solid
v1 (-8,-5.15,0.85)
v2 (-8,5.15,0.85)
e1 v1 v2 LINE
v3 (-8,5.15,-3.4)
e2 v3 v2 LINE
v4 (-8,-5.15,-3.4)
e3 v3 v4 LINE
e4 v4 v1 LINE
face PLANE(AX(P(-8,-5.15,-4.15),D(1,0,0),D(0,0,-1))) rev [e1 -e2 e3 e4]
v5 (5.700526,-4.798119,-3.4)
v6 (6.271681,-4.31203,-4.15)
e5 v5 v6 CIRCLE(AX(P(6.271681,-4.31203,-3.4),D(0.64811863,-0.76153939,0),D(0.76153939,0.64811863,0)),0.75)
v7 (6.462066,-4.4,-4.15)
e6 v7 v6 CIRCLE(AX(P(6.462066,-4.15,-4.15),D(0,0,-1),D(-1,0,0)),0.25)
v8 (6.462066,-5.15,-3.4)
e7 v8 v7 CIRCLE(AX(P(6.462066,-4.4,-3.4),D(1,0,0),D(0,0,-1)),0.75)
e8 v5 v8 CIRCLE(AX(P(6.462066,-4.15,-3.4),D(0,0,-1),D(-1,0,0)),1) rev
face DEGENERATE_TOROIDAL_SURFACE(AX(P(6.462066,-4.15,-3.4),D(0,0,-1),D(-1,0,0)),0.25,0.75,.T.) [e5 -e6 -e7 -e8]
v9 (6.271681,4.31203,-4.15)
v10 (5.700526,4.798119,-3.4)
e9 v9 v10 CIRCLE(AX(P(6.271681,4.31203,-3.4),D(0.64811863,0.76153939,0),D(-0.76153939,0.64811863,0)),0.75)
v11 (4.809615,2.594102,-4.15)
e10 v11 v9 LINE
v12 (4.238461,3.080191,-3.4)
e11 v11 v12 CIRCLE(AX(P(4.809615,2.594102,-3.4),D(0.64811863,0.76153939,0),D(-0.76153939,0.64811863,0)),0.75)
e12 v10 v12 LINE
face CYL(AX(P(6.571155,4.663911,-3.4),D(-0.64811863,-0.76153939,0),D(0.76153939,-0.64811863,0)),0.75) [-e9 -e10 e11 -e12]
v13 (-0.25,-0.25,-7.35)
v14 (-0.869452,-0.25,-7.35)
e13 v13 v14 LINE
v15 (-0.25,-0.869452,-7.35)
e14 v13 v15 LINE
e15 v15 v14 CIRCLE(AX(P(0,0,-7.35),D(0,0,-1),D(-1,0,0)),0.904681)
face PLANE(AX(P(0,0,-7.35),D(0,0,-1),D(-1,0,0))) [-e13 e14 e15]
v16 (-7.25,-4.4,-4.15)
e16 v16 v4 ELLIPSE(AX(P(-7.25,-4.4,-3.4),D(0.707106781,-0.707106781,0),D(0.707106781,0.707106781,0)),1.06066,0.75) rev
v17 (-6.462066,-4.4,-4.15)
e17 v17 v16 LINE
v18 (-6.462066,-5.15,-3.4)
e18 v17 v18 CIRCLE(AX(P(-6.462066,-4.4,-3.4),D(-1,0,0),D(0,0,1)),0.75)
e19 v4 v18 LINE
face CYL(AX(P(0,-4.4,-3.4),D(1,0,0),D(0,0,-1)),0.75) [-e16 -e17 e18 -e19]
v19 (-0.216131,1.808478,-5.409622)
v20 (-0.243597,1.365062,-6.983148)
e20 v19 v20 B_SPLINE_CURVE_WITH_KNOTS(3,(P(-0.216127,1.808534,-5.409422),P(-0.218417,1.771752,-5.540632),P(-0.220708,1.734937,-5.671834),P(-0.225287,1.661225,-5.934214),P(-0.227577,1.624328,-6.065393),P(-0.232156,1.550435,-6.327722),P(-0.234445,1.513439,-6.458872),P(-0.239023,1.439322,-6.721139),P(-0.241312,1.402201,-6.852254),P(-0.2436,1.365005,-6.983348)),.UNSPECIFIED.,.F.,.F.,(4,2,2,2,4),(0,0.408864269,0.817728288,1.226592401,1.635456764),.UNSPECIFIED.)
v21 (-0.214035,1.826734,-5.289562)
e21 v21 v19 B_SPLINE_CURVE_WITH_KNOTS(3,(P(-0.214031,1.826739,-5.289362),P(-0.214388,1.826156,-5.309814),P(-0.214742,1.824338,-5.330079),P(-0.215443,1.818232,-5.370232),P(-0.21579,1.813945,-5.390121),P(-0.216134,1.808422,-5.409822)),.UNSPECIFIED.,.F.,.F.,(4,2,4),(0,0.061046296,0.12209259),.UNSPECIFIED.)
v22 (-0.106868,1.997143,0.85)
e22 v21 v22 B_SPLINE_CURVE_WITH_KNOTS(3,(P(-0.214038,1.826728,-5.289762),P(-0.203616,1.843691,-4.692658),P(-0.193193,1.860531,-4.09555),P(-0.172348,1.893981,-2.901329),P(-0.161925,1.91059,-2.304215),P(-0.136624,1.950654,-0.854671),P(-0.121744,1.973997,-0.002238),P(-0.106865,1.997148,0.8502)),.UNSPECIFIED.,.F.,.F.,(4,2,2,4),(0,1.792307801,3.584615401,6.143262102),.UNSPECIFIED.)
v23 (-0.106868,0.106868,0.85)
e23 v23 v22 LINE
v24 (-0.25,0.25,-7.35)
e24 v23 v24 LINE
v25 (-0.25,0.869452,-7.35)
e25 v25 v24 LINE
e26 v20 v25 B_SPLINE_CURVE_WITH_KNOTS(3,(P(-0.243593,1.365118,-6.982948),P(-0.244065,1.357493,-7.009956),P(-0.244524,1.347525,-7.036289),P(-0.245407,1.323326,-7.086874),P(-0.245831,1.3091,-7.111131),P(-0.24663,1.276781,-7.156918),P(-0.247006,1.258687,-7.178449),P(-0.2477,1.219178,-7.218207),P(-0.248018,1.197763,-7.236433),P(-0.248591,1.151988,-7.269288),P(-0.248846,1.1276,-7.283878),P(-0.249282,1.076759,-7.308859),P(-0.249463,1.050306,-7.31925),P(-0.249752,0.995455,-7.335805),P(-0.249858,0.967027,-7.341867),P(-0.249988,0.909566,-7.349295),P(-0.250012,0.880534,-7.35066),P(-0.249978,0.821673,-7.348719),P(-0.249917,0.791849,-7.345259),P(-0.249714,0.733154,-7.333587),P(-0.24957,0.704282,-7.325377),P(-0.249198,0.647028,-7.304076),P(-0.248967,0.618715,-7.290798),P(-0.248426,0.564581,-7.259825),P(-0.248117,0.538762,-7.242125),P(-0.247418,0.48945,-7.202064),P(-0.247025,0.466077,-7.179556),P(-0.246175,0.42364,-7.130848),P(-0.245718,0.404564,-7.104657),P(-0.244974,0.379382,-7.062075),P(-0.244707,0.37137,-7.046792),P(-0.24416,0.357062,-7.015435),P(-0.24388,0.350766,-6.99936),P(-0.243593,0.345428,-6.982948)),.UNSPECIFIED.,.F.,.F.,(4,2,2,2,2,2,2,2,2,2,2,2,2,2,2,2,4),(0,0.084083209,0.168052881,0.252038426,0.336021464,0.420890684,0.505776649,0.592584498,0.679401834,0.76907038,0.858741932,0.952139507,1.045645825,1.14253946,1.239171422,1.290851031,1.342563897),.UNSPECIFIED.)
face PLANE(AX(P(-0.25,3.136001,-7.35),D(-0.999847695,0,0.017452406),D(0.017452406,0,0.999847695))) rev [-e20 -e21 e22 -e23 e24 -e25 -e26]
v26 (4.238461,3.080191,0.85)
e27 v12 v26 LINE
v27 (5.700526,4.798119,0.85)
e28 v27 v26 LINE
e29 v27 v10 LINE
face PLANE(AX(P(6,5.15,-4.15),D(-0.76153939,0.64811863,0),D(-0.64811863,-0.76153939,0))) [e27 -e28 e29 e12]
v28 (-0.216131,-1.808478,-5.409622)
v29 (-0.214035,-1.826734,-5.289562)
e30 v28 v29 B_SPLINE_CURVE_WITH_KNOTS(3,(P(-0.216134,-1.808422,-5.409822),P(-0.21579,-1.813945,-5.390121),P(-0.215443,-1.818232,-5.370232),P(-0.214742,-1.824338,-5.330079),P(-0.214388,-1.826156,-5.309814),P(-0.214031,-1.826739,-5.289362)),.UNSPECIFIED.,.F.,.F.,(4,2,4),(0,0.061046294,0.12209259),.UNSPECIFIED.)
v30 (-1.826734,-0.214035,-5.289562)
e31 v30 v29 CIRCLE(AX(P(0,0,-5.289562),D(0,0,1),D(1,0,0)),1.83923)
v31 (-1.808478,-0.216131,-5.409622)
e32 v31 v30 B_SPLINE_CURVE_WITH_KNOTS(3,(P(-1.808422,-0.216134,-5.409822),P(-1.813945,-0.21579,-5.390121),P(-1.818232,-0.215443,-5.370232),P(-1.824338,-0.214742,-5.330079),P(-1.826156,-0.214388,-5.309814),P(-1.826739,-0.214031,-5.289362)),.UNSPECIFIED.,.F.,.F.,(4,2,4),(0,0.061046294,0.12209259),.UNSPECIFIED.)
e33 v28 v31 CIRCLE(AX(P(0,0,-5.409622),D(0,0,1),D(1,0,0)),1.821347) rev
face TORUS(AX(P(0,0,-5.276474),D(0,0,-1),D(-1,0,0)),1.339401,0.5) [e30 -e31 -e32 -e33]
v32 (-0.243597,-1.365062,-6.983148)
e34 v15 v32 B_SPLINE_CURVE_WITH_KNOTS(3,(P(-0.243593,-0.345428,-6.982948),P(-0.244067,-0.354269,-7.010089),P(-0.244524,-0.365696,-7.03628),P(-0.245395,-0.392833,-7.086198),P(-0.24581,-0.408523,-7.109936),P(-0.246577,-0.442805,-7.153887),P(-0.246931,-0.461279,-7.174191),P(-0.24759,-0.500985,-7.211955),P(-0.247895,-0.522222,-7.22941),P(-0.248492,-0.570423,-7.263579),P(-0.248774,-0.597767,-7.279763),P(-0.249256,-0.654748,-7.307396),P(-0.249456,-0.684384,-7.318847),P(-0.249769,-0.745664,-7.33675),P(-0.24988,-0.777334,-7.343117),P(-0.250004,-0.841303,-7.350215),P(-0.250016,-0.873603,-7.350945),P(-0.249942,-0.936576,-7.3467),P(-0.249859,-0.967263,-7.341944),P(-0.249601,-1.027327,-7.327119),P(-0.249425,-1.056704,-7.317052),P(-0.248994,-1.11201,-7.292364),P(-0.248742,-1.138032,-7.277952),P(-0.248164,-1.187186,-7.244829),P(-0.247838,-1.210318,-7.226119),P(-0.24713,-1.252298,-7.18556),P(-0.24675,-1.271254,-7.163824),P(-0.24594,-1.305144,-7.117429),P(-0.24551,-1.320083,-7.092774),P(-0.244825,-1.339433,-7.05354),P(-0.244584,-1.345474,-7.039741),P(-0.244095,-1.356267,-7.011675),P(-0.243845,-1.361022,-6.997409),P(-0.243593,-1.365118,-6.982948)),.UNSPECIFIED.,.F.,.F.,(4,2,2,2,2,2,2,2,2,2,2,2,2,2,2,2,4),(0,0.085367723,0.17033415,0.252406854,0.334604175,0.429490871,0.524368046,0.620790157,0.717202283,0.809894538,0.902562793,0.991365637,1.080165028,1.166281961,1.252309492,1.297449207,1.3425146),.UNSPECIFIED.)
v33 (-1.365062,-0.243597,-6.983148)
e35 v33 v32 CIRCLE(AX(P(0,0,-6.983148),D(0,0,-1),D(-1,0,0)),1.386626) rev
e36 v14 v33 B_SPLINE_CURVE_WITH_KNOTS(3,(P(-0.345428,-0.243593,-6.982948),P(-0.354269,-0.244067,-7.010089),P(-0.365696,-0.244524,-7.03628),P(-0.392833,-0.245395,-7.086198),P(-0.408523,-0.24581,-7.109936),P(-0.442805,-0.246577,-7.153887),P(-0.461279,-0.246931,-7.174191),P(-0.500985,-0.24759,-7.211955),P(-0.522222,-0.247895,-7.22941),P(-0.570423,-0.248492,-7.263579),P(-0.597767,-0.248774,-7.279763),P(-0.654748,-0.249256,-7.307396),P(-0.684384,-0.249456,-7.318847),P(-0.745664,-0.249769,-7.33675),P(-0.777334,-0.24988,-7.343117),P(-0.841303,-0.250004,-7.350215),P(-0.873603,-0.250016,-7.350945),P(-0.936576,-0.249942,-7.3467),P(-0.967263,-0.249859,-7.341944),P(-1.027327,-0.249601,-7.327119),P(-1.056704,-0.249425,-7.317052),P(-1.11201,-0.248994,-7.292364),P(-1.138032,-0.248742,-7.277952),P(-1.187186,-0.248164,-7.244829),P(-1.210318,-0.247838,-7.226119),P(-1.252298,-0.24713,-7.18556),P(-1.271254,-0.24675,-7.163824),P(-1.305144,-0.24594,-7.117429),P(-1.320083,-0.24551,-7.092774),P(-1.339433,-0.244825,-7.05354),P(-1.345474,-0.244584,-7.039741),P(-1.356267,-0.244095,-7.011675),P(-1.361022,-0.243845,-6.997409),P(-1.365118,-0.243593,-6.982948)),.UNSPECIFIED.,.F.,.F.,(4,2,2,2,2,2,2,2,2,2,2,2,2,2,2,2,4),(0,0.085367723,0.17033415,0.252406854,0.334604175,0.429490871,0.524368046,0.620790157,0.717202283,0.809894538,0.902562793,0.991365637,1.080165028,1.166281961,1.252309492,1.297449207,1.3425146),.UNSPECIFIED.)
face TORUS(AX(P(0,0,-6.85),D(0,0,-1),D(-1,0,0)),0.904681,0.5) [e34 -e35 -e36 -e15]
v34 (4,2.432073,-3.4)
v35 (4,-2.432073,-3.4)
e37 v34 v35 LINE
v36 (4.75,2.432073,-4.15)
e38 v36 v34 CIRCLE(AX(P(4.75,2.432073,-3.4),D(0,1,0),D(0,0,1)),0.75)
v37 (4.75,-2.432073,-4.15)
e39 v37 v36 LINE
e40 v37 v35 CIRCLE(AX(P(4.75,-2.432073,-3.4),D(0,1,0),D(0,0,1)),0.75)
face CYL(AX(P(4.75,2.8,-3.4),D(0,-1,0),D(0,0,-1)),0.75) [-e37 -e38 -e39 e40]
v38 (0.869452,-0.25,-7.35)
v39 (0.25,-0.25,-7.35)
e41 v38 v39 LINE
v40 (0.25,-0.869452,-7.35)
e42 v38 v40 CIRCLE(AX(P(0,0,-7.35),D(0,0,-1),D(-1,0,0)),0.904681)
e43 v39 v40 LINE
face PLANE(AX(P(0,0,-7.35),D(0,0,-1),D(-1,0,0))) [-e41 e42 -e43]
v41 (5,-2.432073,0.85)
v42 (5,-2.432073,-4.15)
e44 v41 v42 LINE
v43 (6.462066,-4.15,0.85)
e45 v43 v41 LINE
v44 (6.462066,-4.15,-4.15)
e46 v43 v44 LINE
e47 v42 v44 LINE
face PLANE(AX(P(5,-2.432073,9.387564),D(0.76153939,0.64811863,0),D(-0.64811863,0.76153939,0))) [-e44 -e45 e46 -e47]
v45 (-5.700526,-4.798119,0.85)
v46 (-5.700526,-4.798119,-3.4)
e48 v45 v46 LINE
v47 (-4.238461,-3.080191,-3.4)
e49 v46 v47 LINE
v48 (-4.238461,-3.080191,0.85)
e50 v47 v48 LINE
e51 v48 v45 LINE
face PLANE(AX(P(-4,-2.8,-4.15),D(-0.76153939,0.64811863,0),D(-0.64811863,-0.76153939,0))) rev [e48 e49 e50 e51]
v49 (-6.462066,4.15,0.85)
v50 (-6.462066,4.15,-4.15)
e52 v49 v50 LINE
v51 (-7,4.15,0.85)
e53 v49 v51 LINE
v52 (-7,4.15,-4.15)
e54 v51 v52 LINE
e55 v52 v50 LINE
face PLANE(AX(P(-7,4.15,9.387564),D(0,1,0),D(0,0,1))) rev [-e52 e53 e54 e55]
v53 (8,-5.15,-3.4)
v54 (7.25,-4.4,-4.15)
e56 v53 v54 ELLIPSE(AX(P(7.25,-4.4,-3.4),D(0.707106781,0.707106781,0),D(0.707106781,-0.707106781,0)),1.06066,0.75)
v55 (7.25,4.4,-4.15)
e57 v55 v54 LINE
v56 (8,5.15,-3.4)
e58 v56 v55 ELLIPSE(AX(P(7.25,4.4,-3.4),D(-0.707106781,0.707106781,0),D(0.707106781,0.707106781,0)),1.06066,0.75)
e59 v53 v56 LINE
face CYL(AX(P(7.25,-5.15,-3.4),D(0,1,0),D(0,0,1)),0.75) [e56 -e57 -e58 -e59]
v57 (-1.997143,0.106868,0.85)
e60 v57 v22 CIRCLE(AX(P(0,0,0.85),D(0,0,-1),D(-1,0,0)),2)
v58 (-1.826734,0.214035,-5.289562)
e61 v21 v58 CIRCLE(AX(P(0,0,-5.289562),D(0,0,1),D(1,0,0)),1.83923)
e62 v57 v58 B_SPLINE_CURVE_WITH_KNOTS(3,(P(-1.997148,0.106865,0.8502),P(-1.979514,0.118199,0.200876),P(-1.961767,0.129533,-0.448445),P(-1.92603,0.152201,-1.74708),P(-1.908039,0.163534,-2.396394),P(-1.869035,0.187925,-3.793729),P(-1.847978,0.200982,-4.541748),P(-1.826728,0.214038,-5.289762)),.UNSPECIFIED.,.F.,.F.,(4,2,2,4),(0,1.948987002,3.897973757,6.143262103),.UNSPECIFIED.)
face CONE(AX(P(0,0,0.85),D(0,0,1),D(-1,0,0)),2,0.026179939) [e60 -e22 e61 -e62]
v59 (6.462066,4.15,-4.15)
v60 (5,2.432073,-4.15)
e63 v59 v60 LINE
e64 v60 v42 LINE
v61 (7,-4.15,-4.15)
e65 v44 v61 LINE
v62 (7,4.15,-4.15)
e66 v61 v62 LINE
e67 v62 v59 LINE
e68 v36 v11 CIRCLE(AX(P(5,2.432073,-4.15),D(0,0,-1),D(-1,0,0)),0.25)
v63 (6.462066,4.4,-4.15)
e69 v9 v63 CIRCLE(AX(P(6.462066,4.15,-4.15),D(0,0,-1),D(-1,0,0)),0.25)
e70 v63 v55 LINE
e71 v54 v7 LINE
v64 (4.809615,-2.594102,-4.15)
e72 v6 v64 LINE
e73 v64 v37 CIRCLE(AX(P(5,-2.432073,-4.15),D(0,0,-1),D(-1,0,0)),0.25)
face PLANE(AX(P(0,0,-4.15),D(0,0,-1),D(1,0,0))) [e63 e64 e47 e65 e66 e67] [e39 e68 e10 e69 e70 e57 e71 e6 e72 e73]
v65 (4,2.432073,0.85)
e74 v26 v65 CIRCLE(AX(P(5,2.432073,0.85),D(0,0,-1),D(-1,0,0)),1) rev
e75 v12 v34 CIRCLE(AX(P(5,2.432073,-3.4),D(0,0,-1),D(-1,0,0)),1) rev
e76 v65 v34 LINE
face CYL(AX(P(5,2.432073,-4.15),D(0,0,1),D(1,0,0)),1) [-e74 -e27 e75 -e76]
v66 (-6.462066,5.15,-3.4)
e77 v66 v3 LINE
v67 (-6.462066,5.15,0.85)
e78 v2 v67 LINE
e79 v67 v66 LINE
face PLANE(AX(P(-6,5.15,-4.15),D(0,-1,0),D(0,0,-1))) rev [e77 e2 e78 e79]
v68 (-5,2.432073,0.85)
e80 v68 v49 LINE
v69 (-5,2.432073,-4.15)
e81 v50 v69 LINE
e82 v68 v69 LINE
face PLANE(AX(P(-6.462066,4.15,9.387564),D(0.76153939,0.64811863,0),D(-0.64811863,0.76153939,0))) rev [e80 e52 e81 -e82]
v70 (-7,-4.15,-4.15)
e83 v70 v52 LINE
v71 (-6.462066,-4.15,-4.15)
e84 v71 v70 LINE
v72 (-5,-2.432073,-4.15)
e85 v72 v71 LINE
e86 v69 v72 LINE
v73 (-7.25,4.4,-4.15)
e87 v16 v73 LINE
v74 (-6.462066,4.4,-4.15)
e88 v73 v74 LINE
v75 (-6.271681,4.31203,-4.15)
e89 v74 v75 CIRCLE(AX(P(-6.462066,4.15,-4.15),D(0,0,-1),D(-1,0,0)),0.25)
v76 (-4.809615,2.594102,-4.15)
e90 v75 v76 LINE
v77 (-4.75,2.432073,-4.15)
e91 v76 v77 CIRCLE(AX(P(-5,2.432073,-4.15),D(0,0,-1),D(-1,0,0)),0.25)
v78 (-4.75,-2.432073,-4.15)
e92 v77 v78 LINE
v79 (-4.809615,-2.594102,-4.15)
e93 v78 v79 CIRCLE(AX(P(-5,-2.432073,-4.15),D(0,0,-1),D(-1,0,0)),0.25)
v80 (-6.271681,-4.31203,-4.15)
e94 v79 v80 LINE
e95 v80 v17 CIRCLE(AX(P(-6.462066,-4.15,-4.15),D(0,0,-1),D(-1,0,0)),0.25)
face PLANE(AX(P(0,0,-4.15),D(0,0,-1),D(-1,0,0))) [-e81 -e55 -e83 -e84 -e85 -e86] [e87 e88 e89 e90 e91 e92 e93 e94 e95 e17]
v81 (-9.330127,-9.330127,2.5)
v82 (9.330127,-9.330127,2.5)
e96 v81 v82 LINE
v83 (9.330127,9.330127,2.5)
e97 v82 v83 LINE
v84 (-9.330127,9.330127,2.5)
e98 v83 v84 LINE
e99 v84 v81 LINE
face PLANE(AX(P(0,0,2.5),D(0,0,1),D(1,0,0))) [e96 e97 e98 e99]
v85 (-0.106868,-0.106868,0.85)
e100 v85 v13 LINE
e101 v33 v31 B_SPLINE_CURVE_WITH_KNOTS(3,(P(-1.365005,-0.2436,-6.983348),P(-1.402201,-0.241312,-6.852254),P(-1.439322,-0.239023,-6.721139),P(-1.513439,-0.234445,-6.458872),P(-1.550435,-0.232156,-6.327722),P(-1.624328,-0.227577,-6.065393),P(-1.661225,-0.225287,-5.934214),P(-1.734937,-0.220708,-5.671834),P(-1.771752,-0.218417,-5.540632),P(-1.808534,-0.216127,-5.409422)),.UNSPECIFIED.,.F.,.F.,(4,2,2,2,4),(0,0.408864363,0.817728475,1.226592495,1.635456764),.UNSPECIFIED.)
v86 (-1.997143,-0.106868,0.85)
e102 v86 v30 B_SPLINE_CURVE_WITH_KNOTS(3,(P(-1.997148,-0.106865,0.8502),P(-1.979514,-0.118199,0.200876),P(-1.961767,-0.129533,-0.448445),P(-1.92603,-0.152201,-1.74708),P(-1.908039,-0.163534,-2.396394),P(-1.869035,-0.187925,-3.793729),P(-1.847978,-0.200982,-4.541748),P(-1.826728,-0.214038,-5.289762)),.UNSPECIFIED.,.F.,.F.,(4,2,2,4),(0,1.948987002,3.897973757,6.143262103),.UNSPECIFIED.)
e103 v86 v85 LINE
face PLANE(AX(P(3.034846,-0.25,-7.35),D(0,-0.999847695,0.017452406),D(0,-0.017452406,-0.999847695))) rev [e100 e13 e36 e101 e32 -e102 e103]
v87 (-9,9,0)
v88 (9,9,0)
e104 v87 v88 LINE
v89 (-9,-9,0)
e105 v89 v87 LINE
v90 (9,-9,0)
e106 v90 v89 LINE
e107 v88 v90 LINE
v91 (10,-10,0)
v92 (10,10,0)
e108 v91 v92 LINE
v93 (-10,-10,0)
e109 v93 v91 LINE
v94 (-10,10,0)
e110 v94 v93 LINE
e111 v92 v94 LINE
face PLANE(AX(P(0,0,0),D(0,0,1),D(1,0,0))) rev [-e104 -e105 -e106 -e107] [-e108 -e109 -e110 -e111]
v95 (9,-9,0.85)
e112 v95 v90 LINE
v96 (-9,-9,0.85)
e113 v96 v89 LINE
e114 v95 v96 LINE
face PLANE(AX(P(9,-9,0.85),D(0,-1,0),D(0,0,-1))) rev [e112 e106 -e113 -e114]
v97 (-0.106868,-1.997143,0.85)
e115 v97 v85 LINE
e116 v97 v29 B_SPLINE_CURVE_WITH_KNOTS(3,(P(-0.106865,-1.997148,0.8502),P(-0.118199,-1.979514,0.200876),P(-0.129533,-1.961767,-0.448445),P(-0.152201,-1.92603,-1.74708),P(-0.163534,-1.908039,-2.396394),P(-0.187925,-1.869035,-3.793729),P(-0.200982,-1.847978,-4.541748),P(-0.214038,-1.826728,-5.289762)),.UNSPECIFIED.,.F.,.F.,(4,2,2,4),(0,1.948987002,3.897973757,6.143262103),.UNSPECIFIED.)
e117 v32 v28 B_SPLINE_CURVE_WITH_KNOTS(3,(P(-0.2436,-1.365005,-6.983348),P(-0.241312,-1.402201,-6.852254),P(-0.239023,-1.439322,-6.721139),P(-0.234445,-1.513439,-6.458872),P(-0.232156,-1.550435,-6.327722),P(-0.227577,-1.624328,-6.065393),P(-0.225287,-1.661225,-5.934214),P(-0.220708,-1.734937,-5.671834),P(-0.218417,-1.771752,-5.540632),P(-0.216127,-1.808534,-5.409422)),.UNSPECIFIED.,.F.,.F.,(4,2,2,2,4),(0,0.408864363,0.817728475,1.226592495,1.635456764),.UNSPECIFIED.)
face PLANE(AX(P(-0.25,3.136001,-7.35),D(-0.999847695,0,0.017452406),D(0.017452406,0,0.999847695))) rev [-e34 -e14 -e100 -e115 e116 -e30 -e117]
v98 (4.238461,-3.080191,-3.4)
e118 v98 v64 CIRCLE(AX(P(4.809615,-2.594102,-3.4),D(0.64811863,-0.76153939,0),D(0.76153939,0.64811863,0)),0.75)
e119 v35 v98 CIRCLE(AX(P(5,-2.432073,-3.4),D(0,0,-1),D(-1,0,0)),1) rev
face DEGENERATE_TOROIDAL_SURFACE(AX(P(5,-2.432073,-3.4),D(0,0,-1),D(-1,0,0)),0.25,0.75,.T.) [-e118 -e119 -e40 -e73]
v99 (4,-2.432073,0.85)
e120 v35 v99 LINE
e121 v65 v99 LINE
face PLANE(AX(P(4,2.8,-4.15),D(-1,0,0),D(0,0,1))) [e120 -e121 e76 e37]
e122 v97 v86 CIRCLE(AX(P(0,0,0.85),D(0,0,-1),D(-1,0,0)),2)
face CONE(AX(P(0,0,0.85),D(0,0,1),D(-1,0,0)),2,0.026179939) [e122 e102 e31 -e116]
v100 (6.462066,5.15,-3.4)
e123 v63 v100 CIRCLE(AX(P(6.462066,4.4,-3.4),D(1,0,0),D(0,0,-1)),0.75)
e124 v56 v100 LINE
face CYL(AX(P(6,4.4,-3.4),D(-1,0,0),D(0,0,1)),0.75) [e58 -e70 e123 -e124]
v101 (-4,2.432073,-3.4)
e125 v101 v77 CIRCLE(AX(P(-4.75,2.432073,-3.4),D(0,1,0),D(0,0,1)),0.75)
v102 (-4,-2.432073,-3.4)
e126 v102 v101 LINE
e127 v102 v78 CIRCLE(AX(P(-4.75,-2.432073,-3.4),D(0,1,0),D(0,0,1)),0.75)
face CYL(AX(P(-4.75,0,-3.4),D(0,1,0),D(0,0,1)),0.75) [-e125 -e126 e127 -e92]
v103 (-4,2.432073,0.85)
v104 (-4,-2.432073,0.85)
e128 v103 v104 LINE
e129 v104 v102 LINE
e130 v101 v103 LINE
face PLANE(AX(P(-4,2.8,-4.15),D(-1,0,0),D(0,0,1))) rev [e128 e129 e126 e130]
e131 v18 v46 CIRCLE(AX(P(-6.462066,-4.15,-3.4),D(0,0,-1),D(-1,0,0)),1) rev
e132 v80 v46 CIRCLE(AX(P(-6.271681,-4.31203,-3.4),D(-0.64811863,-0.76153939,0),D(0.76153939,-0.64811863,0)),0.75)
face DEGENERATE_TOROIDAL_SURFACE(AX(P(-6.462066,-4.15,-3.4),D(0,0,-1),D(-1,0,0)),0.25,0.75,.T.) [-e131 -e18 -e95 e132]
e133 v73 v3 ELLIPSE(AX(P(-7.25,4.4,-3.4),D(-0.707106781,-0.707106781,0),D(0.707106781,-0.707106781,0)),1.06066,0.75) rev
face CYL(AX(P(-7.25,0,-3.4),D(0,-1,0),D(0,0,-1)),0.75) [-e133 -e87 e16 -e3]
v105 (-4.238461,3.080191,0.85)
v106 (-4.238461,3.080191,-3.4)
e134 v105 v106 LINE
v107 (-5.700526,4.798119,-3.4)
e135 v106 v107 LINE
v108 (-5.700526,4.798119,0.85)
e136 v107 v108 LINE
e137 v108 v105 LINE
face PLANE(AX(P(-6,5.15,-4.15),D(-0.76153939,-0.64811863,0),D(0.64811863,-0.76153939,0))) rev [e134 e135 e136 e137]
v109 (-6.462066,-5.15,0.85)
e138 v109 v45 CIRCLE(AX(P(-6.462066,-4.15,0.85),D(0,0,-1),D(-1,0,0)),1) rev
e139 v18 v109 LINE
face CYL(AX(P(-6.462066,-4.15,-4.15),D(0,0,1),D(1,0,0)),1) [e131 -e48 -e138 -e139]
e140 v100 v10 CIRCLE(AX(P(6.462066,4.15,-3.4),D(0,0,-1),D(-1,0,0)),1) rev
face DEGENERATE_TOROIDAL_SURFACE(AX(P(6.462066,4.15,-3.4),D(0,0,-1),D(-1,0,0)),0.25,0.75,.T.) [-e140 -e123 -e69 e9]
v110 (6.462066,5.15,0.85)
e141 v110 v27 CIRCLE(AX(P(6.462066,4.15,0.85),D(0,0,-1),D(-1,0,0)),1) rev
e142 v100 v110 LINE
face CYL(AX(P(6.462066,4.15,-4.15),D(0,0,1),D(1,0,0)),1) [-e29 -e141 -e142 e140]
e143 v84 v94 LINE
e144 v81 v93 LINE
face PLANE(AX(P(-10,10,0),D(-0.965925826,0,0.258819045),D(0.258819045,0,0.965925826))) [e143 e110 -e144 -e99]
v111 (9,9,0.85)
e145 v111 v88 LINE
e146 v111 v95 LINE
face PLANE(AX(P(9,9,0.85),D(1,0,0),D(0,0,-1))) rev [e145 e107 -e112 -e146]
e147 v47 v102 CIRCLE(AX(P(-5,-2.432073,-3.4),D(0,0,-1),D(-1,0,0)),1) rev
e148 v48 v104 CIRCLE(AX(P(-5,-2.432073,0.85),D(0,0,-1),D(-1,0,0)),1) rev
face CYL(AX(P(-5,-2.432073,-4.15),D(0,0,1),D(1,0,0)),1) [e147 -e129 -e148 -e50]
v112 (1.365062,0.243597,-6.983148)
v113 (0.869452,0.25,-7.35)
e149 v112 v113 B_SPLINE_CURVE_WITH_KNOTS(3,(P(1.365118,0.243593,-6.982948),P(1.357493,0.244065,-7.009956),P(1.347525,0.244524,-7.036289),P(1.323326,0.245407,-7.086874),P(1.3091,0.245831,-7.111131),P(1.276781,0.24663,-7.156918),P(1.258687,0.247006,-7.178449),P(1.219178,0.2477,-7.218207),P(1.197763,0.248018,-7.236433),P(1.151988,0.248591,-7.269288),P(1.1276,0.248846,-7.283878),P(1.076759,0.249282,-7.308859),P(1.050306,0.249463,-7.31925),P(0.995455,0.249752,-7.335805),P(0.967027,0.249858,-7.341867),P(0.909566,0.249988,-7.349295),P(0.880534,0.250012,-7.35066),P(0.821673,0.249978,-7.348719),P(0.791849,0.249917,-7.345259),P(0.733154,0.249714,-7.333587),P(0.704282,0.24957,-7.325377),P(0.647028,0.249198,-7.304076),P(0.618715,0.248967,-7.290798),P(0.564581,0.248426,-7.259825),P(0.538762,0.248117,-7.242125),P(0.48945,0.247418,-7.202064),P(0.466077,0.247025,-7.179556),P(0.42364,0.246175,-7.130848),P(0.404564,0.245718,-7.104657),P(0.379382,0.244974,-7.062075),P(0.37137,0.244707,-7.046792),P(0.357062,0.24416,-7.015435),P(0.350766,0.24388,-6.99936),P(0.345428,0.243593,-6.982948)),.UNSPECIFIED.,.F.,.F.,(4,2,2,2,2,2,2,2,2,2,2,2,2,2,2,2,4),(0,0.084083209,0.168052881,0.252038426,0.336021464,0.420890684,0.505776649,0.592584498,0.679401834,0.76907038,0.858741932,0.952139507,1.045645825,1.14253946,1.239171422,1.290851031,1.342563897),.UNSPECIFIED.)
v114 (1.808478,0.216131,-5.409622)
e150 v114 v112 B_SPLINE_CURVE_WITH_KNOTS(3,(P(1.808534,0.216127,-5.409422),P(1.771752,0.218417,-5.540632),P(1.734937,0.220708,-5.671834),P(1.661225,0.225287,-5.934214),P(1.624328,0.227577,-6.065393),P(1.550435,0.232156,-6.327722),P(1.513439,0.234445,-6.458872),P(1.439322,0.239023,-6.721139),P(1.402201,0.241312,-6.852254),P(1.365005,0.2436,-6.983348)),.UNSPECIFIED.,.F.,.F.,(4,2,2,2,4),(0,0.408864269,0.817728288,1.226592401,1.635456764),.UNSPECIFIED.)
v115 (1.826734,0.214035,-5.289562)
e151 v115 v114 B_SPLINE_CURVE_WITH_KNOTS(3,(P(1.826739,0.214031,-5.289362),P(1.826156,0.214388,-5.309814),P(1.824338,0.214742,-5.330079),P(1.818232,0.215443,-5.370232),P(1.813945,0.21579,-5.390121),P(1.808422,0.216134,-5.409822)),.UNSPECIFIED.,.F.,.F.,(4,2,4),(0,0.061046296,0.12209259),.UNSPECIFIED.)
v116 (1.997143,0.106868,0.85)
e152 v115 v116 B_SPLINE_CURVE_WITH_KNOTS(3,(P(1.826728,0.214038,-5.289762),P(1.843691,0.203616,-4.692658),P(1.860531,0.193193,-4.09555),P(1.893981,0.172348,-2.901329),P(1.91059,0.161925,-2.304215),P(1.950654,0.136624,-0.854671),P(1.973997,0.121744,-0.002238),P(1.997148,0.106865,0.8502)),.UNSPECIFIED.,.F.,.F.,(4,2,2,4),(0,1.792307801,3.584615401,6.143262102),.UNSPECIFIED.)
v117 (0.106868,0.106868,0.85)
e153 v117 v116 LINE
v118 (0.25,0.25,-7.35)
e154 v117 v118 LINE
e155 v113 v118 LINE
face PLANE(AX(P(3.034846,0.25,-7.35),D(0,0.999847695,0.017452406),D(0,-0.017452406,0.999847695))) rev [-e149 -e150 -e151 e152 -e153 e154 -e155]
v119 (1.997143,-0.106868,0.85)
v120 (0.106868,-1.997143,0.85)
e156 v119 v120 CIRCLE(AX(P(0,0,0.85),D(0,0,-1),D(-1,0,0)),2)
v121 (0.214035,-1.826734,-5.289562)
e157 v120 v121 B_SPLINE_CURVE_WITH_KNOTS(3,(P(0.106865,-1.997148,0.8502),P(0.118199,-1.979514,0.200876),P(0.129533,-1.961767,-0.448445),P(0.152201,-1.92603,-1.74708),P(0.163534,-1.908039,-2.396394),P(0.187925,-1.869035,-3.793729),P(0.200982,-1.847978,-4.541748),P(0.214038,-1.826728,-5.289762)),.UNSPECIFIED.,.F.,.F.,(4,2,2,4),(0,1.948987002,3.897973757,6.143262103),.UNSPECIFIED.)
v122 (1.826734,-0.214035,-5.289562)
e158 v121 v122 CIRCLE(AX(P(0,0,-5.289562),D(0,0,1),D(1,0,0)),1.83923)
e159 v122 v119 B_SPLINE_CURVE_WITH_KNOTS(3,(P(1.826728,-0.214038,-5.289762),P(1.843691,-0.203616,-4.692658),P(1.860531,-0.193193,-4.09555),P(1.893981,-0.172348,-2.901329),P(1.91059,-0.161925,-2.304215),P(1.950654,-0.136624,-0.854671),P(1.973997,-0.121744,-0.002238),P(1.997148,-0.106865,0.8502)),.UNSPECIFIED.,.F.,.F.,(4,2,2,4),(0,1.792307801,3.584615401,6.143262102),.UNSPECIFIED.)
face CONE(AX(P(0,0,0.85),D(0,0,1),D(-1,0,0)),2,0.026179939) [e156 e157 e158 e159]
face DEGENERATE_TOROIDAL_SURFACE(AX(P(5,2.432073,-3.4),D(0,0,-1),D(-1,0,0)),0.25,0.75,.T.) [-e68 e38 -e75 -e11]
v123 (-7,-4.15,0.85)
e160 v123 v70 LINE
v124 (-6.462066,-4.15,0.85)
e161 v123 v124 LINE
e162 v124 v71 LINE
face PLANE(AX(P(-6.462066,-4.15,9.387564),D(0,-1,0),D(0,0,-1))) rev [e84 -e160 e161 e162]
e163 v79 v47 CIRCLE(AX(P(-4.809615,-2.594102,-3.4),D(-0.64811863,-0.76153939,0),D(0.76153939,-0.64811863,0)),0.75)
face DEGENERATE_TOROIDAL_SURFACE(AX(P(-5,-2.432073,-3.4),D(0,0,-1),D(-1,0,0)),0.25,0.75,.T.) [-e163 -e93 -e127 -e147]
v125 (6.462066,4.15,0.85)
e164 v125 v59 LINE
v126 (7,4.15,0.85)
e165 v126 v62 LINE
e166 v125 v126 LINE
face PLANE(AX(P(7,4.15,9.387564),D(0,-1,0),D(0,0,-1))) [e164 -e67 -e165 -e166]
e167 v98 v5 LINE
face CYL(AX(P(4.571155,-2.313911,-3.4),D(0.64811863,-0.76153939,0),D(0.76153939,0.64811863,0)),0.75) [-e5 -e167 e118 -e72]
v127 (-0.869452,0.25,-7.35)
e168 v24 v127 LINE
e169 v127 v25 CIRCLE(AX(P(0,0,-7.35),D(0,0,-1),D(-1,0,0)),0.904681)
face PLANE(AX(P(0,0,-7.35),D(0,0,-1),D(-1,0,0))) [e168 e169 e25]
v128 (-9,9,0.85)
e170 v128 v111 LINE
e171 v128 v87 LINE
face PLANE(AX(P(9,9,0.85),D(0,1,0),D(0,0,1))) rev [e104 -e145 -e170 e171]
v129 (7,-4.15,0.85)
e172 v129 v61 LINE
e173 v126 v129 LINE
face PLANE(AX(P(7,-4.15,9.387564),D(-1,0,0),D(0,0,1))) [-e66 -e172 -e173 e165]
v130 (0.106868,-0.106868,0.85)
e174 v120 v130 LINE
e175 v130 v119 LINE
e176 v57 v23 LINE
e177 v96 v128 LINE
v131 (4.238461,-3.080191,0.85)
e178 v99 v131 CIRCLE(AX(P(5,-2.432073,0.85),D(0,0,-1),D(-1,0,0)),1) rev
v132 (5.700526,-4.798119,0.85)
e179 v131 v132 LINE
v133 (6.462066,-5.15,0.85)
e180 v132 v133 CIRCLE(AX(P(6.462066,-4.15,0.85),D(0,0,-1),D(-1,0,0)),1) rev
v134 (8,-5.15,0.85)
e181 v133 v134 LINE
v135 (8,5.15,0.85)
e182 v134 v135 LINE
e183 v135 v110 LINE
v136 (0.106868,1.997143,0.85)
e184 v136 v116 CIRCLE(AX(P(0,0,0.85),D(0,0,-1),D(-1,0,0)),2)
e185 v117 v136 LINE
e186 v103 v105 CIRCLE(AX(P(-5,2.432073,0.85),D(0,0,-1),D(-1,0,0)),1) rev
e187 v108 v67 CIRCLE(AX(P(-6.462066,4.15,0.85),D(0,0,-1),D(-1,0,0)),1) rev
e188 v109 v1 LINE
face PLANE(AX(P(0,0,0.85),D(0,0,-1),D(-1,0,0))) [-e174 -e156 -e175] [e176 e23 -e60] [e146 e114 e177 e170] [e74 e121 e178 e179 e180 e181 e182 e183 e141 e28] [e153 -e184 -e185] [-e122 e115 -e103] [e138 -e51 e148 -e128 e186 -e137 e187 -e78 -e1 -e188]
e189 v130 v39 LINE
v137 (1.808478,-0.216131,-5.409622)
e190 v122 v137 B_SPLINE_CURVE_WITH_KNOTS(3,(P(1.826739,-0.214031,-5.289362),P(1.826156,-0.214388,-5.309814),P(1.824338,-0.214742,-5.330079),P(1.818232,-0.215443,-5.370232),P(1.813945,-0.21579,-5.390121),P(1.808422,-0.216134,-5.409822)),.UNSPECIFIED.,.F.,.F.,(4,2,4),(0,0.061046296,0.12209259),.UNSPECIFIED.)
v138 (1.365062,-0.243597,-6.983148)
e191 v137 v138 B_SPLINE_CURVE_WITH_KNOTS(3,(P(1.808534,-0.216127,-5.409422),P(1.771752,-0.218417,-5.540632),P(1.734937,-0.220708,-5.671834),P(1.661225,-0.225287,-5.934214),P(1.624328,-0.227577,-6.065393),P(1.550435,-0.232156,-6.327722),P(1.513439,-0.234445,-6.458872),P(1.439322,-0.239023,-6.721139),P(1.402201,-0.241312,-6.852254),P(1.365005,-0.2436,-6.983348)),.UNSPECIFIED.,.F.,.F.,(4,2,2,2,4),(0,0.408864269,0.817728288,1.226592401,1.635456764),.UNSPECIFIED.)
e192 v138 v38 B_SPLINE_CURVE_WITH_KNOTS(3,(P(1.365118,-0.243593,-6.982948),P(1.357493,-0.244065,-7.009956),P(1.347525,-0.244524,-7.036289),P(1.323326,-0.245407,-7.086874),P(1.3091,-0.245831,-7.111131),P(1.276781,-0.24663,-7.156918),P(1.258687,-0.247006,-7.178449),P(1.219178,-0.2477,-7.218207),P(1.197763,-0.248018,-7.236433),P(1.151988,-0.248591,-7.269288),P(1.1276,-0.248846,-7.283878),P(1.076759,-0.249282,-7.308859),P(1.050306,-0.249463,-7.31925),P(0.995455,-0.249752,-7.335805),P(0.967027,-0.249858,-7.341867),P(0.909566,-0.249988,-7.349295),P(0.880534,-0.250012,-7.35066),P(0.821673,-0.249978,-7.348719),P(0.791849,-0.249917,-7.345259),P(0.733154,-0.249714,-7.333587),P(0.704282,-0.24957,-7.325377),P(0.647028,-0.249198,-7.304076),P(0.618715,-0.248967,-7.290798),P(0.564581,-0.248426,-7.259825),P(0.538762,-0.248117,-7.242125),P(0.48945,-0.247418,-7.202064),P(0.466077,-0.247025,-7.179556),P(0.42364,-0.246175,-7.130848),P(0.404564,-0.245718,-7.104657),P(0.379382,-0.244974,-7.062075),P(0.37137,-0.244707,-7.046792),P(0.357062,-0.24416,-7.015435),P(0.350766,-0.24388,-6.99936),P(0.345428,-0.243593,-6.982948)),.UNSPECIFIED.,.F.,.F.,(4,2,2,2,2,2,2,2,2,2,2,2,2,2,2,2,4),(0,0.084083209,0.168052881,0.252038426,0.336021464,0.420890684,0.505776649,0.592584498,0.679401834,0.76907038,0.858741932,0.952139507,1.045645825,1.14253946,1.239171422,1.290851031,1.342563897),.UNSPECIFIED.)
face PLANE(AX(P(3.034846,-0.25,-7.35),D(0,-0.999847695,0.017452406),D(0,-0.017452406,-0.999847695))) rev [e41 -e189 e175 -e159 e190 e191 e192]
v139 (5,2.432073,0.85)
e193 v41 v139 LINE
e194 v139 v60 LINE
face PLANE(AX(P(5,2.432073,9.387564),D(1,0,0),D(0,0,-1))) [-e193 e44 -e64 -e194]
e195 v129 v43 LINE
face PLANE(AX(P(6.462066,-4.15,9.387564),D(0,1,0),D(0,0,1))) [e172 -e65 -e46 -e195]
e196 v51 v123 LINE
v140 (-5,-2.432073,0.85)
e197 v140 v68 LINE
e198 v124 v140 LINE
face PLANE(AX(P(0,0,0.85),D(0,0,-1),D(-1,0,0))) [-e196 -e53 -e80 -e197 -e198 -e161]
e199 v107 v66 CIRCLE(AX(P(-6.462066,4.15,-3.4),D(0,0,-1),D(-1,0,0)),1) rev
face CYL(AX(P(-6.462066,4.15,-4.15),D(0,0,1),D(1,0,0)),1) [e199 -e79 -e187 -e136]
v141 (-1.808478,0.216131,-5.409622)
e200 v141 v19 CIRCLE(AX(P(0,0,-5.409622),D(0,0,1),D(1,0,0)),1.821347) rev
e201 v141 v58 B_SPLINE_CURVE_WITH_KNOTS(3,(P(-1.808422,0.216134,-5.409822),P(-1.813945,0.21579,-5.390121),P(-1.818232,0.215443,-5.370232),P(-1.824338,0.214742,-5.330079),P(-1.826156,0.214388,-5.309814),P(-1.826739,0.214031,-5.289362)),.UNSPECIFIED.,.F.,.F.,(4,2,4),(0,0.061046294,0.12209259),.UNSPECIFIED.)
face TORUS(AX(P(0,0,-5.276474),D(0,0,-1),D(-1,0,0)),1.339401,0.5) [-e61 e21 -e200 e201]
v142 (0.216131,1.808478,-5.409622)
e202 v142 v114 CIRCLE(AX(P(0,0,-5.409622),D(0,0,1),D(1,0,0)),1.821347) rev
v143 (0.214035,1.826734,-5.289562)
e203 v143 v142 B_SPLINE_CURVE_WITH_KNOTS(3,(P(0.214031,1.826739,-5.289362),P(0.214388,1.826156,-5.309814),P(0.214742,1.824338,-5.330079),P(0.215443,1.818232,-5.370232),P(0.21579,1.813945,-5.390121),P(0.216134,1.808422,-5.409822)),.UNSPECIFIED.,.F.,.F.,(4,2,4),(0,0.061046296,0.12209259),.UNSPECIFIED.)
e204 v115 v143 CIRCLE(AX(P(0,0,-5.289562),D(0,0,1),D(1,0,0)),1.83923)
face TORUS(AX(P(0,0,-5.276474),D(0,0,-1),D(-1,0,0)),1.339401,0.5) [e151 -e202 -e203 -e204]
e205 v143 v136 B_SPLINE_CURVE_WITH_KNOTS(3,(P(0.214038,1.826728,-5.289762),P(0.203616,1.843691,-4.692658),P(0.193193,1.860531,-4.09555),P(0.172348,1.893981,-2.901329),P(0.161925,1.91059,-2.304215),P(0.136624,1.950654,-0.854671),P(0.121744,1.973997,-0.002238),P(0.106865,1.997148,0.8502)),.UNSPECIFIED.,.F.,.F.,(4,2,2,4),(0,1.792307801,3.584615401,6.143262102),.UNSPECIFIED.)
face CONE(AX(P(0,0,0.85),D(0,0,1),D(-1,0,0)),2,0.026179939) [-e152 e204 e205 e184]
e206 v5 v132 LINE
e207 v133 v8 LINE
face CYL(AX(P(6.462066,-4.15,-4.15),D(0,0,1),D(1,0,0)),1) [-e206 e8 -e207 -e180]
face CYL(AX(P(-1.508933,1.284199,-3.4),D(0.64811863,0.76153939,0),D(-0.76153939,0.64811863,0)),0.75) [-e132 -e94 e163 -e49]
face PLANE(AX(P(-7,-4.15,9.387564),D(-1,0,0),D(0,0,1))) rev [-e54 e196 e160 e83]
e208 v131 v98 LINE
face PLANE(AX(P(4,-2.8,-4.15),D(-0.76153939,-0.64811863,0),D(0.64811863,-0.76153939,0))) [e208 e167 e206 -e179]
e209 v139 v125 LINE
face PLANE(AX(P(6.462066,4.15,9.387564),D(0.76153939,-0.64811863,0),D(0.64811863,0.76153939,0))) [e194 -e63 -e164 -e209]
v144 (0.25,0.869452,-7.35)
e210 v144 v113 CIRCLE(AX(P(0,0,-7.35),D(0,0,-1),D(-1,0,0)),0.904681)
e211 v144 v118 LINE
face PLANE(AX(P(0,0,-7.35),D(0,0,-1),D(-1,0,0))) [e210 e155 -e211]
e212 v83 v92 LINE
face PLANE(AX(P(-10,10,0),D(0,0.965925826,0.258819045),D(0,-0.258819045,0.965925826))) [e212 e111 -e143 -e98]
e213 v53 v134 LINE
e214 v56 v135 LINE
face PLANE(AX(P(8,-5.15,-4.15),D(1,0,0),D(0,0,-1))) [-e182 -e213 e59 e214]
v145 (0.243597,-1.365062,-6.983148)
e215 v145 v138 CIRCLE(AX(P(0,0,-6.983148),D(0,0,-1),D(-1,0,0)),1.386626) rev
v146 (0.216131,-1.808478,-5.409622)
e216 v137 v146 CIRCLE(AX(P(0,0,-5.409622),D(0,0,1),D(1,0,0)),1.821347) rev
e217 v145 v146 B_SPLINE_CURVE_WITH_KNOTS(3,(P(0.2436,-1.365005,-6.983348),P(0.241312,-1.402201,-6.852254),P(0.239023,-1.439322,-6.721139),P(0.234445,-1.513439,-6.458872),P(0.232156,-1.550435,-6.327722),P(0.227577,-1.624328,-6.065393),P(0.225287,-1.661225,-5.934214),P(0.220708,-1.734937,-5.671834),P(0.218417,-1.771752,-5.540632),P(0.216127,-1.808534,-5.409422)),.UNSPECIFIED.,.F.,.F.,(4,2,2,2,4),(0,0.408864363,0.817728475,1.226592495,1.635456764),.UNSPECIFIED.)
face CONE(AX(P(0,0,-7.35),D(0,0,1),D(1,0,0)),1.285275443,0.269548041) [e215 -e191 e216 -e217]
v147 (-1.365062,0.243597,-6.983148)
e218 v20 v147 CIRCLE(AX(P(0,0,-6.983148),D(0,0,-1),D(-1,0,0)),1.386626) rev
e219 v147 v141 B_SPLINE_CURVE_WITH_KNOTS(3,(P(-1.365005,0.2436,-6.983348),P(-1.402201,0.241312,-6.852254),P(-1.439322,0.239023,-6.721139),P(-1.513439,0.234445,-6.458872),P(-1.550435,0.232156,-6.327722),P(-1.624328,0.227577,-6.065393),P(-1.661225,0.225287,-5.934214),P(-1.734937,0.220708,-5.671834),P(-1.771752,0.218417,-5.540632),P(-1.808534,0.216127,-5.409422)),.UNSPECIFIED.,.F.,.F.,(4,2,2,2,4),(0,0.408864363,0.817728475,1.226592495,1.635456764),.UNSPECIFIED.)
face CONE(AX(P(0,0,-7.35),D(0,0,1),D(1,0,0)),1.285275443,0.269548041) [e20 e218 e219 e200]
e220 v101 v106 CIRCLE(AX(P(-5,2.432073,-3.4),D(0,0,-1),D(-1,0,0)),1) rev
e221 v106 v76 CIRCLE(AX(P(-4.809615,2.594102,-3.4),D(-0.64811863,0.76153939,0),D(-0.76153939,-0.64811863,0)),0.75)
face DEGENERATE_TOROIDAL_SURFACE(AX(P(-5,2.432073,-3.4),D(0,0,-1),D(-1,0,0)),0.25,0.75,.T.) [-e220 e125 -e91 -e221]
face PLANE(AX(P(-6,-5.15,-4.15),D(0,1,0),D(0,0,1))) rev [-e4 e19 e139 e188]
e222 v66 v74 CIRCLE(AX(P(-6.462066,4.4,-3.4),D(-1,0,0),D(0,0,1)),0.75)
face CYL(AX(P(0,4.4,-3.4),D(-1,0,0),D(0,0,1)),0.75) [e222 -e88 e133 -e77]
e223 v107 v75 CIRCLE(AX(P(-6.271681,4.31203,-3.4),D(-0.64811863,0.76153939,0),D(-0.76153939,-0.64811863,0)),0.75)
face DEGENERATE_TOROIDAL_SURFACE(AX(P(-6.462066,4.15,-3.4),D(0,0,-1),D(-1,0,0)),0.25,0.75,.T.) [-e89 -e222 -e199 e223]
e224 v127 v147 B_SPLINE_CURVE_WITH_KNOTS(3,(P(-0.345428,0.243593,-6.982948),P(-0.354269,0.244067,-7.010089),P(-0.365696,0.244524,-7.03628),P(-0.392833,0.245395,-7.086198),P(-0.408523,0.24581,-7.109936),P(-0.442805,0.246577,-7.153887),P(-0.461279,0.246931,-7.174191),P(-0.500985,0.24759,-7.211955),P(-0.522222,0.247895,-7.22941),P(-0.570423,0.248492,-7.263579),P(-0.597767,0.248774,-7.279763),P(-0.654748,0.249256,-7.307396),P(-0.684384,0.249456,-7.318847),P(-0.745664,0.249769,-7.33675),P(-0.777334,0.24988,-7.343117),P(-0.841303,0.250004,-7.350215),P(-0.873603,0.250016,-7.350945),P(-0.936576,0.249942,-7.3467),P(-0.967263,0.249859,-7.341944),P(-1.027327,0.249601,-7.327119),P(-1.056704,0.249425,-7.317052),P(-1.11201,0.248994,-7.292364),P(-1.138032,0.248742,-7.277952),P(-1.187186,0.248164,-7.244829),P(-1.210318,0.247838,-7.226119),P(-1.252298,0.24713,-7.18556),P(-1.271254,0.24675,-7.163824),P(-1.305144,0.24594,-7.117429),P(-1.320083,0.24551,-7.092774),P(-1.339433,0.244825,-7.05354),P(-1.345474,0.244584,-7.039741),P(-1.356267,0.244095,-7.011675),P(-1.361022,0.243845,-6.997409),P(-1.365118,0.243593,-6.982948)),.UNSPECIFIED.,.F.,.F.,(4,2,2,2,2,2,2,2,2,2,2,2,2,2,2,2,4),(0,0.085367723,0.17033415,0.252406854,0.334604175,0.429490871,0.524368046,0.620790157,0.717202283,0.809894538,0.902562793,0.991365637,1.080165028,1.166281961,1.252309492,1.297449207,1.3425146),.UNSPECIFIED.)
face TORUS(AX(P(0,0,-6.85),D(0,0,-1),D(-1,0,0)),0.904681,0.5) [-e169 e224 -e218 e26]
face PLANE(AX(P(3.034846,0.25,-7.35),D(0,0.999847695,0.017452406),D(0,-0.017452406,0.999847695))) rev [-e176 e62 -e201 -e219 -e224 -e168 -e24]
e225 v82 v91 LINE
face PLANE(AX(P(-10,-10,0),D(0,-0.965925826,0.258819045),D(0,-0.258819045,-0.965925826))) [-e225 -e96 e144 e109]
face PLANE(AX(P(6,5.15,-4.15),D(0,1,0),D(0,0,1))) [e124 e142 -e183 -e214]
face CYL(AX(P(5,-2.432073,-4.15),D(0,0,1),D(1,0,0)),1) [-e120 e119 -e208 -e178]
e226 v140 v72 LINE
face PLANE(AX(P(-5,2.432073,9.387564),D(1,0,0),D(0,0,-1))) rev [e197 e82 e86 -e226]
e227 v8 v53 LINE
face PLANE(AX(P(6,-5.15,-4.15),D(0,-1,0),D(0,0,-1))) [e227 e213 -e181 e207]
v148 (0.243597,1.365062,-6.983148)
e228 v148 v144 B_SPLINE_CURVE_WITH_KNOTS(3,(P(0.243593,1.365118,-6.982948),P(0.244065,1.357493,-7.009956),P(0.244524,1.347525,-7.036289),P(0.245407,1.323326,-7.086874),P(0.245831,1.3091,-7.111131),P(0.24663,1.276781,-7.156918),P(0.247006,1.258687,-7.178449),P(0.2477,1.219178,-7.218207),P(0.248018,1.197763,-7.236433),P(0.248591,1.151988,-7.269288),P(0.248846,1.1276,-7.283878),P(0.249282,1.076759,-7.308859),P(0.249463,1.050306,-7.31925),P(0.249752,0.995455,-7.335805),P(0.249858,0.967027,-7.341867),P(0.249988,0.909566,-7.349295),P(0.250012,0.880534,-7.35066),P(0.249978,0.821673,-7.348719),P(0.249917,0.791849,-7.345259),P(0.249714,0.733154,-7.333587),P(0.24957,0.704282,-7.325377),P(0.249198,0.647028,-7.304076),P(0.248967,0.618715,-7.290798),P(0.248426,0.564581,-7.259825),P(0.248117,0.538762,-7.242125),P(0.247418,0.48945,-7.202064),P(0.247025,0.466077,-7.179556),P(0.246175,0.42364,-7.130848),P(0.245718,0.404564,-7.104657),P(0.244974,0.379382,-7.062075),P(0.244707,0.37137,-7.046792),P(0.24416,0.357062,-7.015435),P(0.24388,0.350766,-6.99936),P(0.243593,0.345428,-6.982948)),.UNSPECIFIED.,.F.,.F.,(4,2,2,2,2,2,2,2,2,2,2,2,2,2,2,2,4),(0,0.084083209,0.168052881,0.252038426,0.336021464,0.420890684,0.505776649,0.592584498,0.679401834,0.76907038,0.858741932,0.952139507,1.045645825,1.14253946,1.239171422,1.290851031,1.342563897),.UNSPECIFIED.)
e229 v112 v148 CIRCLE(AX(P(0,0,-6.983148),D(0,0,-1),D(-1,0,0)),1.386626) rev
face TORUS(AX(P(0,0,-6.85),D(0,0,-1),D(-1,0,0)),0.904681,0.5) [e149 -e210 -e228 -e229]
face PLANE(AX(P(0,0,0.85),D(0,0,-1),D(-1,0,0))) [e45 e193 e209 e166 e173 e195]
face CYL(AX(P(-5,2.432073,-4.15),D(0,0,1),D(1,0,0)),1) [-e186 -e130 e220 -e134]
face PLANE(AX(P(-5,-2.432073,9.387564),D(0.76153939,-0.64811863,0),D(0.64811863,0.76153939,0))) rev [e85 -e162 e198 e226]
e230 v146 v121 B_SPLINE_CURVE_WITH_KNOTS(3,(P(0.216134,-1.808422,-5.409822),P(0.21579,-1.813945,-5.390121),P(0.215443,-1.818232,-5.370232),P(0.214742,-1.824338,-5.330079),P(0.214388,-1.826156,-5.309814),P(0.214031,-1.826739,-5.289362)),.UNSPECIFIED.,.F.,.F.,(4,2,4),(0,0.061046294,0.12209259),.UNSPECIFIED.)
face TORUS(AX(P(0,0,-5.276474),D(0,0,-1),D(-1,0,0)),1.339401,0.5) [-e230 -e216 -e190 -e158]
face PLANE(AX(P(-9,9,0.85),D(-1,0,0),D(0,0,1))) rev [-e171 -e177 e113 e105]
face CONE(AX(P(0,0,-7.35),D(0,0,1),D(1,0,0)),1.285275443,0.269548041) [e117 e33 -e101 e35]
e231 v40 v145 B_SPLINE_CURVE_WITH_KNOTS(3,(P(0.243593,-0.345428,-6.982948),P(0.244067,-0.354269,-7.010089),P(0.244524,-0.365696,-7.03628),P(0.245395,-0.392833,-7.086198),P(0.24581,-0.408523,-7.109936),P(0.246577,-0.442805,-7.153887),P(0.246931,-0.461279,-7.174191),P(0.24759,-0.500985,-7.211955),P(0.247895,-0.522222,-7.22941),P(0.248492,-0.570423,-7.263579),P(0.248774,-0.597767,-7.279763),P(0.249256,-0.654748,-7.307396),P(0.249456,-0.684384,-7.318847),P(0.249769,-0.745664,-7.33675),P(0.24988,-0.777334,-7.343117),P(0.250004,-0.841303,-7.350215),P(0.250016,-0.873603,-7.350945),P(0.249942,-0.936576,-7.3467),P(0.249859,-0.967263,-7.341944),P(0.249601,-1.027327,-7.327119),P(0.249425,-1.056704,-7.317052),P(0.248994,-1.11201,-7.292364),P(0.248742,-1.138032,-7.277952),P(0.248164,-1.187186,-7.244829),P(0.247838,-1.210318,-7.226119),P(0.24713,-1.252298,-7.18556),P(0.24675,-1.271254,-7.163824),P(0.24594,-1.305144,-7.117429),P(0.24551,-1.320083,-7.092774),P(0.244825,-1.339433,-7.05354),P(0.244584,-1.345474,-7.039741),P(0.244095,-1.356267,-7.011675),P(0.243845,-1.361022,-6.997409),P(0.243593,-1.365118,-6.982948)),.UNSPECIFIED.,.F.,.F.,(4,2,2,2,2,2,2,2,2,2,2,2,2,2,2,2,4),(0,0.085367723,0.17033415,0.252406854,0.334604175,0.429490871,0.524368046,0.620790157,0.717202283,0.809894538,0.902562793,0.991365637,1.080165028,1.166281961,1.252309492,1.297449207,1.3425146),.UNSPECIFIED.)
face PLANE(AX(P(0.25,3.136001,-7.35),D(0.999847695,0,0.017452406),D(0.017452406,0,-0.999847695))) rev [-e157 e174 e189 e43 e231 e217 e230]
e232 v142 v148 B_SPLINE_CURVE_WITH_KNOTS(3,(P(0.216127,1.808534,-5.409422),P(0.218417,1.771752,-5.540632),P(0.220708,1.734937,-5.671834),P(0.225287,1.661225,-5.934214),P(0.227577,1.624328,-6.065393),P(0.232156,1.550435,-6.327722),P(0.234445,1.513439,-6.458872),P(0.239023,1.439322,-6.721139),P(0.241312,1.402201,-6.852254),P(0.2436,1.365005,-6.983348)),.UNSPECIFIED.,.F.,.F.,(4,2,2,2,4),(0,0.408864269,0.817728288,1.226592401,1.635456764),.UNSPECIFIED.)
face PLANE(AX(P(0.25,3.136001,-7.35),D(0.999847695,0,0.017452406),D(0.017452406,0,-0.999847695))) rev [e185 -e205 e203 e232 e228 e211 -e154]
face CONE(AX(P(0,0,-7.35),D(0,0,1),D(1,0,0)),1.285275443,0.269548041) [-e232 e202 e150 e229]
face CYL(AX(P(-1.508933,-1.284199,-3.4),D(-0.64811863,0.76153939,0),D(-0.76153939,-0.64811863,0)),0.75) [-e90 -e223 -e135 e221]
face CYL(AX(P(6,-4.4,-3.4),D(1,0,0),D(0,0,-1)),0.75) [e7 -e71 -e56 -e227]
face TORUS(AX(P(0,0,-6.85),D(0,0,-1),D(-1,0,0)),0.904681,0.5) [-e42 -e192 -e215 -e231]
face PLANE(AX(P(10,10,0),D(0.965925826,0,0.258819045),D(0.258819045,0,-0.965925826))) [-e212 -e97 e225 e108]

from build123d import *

# Parameters (mm, degrees)
SKETCH1_W               = 20
SKETCH1_H               = 20
BOSS_EXTRUDE1_DEPTH     = 2.5
BOSS_EXTRUDE1_TAPER     = 15
SKETCH2_W               = 18
SKETCH2_H               = 18
CUT_EXTRUDE1_DEPTH      = 0.85
SKETCH3_R               = 2
BOSS_EXTRUDE2_DEPTH     = 8.2
BOSS_EXTRUDE2_TAPER     = 1.5
CHAMFER1_SIZE           = 2
CHAMFER1_SIZE_2         = 0.5
FILLET1_R               = 0.5
SKETCH4_W               = 0.5
SKETCH4_H               = 6.160058372
SKETCH4_W_2             = 6.292216955
SKETCH4_H_2             = 0.5
CUT_EXTRUDE_THIN1_DEPTH = 8.2
CUT_EXTRUDE_THIN1_TAPER = 1
BOSS_EXTRUDE3_DEPTH     = 5
FILLET2_R               = 1
FILLET3_R               = 0.75
CUT_EXTRUDE2_DEPTH      = 5
FILLET2_OF_MIRROR1_R    = 1
FILLET3_OF_MIRROR1_R    = 0.75


with BuildPart() as part:
    # Sketch1 → Boss-Extrude1 (new body)
    with BuildSketch(Plane.XY):
        Rectangle(SKETCH1_W, SKETCH1_H)
    extrude(amount=BOSS_EXTRUDE1_DEPTH, taper=BOSS_EXTRUDE1_TAPER)

    # Sketch2 → Cut-Extrude1 (cut)
    with BuildSketch(Plane(origin=(0, 0, 0), x_dir=(-1, 0, 0), z_dir=(0, 0, -1))):
        Rectangle(SKETCH2_W, SKETCH2_H)
    extrude(amount=-CUT_EXTRUDE1_DEPTH, mode=Mode.SUBTRACT)

    # Sketch3 → Boss-Extrude2 (add)
    with BuildSketch(Plane(origin=(0, 0, 0.85), x_dir=(-1, 0, 0), z_dir=(0, 0, -1))):
        Circle(SKETCH3_R)
    extrude(amount=BOSS_EXTRUDE2_DEPTH, taper=BOSS_EXTRUDE2_TAPER)

    # Chamfer1
    # the kernel refuses this chamfer: 2, 0.5 mm, written as the material it takes off along each edge
    with BuildSketch(Plane(origin=(0, 0, -7.35), x_dir=(-1, 0, 0), z_dir=(0, 1, 0))) as chamfer1_piece_1:
        Polygon((1.785275443 + CHAMFER1_SIZE * 0.0261769483079, CHAMFER1_SIZE * 0.999657324976), (1.785275443 - CHAMFER1_SIZE_2, 0), (1.785275443, 0), align=None)
    revolve(axis=Axis((0, 0, -7.35), (0, 0, 1)), mode=Mode.SUBTRACT)

    # Fillet1
    fillet1_edges = [part.edges().sort_by_distance(p)[0] for p in [
        (1.285275443, 0, -7.35),
        (1.83762934, 0, -5.35068535),
    ]]
    fillet(fillet1_edges, radius=FILLET1_R)

    # Sketch4 → Cut-Extrude-Thin1 (cut)
    with BuildSketch(Plane(origin=(0, 0, -7.35), x_dir=(-1, 0, 0), z_dir=(0, 0, -1))):
        with Locations((0, 0.055971591)):
            Rectangle(SKETCH4_W, SKETCH4_H)
        with Locations((0.111262179, 0)):
            Rectangle(SKETCH4_W_2, SKETCH4_H_2)
    extrude(amount=-CUT_EXTRUDE_THIN1_DEPTH, taper=CUT_EXTRUDE_THIN1_TAPER, mode=Mode.SUBTRACT)

    # Sketch5 → Boss-Extrude3 (add)
    with BuildSketch(Plane(origin=(0, 0, 0.85), x_dir=(-1, 0, 0), z_dir=(0, 0, -1))):
        Polygon((4, 2.8), (4, -2.8), (6, -5.15), (8, -5.15), (8, 5.15), (6, 5.15), align=None)
    boss_extrude3 = extrude(amount=BOSS_EXTRUDE3_DEPTH)

    # Fillet2
    fillet2_edges = [part.edges().sort_by_distance(p)[0] for p in [
        (-6, -5.15, -1.65),
        (-6, 5.15, -1.65),
        (-4, 2.8, -1.65),
        (-4, -2.8, -1.65),
    ]]
    fillet(fillet2_edges, radius=FILLET2_R)

    # Fillet3
    fillet3_edges = [part.edges().sort_by_distance(p)[0] for p in [
        (-8, 0, -4.15),
        (-7.231032941, 5.15, -4.15),
        (-4.969493552, 3.939154923, -4.15),
        (-7.231032941, -5.15, -4.15),
        (-4, 0, -4.15),
        (-4.969493552, -3.939154923, -4.15),
        (-4.061506689, -2.777370003, -4.15),
        (-6.042613043, -5.057777128, -4.15),
        (-4.061506689, 2.777370003, -4.15),
        (-6.042613043, 5.057777128, -4.15),
    ]]
    fillet(fillet3_edges, radius=FILLET3_R)

    # Sketch6 → Cut-Extrude2 (cut)
    with BuildSketch(Plane(origin=(0, 0, -4.15), x_dir=(-1, 0, 0), z_dir=(0, 0, -1))):
        Polygon((7, -4.15), (7, 4.15), (6.462065883, 4.15), (5, 2.432072588), (5, -2.432072588), (6.462065883, -4.15), align=None)
    cut_extrude2 = extrude(amount=-CUT_EXTRUDE2_DEPTH, mode=Mode.SUBTRACT)

    # Mirror1: Boss-Extrude3, Cut-Extrude2 across plane
    add(boss_extrude3.mirror(Plane(origin=(0, 0, 0), x_dir=(0, 0, 1), z_dir=(1, 0, 0))))
    add(cut_extrude2.mirror(Plane(origin=(0, 0, 0), x_dir=(0, 0, 1), z_dir=(1, 0, 0))), mode=Mode.SUBTRACT)

    # Fillet2 of Mirror1
    fillet2_of_mirror1_edges = [part.edges().sort_by_distance(p)[0] for p in [
        (6, -5.15, -1.65),
        (6, 5.15, -1.65),
        (4, 2.8, -1.65),
        (4, -2.8, -1.65),
    ]]
    fillet(fillet2_of_mirror1_edges, radius=FILLET2_OF_MIRROR1_R)

    # Fillet3 of Mirror1
    fillet3_of_mirror1_edges = [part.edges().sort_by_distance(p)[0] for p in [
        (8, 0, -4.15),
        (7.231032941, 5.15, -4.15),
        (4.969493552, 3.939154923, -4.15),
        (7.231032941, -5.15, -4.15),
        (4, 0, -4.15),
        (4.969493552, -3.939154923, -4.15),
        (4.061506689, -2.777370003, -4.15),
        (6.042613043, -5.057777128, -4.15),
        (4.061506689, 2.777370003, -4.15),
        (6.042613043, 5.057777128, -4.15),
    ]]
    fillet(fillet3_of_mirror1_edges, radius=FILLET3_OF_MIRROR1_R)


solid = part.part
